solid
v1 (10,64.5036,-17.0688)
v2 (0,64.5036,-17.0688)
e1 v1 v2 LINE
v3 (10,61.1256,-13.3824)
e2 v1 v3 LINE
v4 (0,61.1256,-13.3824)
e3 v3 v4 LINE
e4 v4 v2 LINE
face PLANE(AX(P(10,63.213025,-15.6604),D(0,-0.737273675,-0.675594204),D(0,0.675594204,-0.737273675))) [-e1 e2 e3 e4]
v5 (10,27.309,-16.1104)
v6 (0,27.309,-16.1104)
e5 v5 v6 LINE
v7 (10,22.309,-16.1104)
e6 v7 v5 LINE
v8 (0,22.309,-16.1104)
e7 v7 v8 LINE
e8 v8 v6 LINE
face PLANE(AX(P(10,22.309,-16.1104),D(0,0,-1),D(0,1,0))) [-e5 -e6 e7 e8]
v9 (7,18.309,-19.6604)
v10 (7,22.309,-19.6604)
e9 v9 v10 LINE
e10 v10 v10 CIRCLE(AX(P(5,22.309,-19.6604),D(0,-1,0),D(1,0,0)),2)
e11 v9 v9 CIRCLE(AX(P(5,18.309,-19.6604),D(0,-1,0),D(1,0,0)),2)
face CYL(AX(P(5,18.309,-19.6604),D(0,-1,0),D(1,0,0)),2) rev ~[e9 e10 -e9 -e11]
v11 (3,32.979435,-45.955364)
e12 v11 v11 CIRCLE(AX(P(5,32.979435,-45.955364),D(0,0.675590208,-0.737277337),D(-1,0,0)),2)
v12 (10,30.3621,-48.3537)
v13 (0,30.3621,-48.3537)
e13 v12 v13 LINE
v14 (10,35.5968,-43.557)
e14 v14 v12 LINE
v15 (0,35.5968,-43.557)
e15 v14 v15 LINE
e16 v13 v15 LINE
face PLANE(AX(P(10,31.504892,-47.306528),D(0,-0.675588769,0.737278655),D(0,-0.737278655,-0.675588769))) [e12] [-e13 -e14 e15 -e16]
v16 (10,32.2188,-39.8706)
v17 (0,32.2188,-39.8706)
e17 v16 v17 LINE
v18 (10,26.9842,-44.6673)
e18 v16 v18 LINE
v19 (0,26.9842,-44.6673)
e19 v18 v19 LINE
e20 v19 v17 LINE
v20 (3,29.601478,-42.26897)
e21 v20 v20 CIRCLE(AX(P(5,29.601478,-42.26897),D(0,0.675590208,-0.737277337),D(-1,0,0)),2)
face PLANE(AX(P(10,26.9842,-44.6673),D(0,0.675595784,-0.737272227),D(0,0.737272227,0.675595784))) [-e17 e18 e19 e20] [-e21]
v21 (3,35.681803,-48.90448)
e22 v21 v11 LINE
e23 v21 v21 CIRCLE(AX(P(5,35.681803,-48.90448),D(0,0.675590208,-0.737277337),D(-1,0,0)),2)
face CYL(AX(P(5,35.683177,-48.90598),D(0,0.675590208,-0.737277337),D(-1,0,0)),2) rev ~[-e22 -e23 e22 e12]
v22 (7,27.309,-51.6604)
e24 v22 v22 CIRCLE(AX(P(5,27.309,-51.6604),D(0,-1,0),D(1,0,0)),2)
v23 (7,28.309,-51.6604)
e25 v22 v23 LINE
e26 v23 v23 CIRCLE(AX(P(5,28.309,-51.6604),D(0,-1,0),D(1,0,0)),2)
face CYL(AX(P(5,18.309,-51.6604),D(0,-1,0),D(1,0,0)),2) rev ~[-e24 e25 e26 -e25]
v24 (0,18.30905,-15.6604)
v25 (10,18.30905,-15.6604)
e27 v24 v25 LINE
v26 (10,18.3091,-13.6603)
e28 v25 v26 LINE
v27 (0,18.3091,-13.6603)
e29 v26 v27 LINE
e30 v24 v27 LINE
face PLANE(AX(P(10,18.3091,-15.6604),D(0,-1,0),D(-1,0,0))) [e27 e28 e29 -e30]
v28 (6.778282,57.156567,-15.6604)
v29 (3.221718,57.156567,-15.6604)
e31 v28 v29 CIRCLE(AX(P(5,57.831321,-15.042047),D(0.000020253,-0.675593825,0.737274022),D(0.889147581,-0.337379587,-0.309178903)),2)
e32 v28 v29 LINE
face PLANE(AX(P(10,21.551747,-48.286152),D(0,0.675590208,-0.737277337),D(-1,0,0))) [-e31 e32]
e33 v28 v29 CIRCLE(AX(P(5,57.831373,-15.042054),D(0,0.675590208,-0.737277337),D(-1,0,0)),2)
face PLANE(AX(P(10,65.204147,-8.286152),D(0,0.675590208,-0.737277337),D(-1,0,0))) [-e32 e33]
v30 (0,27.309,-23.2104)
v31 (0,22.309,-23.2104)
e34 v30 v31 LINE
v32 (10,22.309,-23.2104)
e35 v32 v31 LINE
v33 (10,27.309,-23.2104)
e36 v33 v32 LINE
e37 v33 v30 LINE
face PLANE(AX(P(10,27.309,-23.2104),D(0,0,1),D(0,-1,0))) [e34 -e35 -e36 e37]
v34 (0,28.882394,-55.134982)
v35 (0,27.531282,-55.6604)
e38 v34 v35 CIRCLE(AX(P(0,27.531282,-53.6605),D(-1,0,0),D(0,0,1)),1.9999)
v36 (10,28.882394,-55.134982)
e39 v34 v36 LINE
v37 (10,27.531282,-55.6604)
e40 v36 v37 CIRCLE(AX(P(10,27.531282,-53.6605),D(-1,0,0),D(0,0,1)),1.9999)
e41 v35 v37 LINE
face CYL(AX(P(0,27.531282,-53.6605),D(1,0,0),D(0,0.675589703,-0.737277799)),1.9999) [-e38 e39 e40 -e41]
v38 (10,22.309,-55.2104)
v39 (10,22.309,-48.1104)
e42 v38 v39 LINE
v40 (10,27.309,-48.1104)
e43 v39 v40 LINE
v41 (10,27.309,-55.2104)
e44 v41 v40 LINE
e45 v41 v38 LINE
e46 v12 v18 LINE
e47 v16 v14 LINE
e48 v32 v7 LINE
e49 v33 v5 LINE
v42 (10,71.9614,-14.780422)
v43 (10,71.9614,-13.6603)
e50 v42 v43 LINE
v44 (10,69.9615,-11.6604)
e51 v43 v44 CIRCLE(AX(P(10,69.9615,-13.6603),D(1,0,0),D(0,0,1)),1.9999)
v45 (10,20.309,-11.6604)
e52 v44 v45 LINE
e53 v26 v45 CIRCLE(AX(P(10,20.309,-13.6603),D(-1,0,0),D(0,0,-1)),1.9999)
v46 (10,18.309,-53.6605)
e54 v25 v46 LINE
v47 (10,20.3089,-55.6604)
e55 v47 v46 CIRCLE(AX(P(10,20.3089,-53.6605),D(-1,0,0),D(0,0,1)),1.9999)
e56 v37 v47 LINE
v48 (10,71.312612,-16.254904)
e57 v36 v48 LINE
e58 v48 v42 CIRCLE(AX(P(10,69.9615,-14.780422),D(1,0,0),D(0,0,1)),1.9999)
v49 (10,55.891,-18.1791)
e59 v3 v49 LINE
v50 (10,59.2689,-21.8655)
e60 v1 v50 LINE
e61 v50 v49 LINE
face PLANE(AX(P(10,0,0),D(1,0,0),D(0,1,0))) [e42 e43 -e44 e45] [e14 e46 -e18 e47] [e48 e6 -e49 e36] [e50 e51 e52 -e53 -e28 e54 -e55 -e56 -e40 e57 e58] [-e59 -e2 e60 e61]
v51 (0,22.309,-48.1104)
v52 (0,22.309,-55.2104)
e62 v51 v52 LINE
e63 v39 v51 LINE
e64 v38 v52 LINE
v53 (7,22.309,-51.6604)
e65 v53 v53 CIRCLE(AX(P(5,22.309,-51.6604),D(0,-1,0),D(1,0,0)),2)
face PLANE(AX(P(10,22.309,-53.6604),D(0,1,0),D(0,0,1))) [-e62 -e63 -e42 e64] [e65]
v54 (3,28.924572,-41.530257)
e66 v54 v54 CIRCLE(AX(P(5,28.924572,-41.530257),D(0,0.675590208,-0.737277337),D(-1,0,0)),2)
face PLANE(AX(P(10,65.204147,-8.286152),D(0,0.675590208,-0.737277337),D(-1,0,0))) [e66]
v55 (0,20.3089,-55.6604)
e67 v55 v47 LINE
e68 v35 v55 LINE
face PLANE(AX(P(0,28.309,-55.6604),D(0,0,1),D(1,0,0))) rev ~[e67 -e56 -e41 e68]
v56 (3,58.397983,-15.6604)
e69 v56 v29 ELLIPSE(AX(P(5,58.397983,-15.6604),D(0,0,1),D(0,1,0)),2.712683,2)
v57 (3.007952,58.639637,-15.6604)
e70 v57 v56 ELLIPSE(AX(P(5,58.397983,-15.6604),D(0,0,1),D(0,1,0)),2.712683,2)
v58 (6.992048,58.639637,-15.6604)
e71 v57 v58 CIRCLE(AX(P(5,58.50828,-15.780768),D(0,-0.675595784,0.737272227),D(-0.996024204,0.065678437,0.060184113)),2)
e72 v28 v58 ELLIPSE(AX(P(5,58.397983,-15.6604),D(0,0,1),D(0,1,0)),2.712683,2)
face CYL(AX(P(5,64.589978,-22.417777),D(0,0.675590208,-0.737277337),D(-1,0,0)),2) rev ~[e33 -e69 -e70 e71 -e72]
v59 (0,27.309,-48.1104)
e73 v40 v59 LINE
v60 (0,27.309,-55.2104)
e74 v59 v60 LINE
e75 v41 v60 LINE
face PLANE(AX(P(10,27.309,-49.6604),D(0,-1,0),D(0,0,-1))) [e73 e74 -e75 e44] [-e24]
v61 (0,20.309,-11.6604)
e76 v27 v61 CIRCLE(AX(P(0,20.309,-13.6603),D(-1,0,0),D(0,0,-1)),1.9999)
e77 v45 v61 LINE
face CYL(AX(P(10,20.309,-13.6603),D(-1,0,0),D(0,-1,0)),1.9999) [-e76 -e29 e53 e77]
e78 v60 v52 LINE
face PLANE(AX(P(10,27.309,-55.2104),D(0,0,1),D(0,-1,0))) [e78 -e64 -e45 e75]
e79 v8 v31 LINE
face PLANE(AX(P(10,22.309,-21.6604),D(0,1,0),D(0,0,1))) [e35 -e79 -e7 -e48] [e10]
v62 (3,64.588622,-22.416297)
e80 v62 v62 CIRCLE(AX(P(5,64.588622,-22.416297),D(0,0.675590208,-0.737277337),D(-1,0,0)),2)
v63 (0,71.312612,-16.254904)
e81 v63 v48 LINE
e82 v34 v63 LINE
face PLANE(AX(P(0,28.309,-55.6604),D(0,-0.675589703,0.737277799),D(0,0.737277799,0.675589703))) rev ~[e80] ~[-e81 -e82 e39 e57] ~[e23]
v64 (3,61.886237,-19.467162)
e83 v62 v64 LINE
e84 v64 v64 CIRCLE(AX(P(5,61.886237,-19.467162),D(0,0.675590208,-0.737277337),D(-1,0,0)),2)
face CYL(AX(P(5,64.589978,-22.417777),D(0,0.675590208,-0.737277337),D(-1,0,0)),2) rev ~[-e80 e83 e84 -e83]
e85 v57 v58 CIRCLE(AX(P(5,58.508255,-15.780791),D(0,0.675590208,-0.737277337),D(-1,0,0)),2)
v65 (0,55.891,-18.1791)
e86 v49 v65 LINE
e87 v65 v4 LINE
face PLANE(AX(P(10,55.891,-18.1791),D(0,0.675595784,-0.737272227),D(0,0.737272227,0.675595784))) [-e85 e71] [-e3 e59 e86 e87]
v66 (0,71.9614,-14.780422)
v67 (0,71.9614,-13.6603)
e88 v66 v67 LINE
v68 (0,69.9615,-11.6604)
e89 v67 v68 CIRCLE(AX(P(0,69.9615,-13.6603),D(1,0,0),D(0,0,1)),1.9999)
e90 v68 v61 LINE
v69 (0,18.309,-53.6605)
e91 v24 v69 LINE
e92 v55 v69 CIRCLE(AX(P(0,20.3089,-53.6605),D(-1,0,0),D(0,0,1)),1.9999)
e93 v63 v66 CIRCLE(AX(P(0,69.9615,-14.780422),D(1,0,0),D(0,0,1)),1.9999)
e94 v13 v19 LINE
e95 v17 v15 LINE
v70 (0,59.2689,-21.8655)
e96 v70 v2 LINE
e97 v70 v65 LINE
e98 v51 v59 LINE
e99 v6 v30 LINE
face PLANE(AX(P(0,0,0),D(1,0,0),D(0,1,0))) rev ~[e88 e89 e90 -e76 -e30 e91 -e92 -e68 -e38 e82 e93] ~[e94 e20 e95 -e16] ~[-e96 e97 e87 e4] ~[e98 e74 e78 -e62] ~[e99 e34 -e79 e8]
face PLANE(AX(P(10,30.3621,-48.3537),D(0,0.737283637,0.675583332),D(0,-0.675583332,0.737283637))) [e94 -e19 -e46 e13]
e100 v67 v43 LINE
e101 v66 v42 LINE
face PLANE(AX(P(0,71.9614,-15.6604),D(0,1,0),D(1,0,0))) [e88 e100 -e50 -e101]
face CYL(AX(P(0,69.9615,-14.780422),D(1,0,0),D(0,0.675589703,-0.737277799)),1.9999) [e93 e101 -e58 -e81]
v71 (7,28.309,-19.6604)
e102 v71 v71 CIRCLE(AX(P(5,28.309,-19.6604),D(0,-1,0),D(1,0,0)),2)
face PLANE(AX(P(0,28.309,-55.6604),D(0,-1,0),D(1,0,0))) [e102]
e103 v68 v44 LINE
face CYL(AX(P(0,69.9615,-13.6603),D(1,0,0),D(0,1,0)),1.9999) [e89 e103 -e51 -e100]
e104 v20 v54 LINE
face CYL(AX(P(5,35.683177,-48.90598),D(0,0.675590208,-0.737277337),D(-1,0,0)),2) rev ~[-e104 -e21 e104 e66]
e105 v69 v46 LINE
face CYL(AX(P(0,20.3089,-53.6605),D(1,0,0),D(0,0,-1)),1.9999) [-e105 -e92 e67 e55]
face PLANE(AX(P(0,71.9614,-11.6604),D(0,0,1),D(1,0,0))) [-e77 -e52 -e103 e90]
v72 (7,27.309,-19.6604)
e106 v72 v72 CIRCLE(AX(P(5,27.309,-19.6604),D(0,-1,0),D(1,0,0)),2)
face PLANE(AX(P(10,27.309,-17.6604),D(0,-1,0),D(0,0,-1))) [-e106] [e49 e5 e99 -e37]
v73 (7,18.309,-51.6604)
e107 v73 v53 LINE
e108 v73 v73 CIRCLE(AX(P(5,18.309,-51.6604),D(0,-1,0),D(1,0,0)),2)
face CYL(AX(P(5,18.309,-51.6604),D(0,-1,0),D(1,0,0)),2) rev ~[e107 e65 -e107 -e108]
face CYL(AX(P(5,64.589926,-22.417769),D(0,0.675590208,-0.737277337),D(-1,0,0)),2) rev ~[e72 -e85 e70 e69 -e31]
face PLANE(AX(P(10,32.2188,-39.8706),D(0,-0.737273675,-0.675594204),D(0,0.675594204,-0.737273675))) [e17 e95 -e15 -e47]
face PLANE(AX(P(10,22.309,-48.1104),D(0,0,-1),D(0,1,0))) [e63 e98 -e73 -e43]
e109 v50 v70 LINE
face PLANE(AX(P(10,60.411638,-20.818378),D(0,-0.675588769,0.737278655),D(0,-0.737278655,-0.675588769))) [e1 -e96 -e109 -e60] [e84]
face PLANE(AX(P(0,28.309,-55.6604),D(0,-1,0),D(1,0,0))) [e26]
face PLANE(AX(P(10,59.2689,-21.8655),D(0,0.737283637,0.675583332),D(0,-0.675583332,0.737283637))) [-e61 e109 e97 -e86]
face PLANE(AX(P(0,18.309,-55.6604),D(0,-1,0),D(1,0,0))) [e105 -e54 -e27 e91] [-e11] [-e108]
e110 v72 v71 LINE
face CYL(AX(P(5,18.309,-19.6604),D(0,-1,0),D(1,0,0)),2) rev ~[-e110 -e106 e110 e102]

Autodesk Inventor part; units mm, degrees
ref_plane "YZ Plane" through (0, 0, 0) normal (1, 0, 0) x (0, 1, 0)
ref_plane "XZ Plane" through (0, 0, 0) normal (0, 1, 0) x (-1, 0, 0)
ref_plane "XY Plane" through (0, 0, 0) normal (0, 0, 1) x (1, 0, 0)
sketch "Sketch1" plane through (0, 0, 0) normal (1, 0, 0) x (0, 1, 0)
  line L0 (28.309, -15.6604) -> (71.9614, -15.6604)
  line L1 (28.309, -55.6604) -> (28.309, -15.6604)
  line L2 (28.309, -55.6604) -> (71.9614, -15.6604)
  point P0 (0, 0)
  dimension "d2" = 42.5
  dimension "d3" = 90
  dimension "d4" = 40
extrude "Extrusion1" add sketch "Sketch1" along normal blind 10
sketch "Sketch2" plane through (0, 28.309, -55.6604) normal (0, -1, 0) x (1, 0, 0)
  line L0 (0, 40) -> (0, 0) projected
  line L1 (0, 0) -> (10, 0) projected
  line L2 (10, 40) -> (10, 0) projected
  line L3 (0, 40) -> (10, 40) projected
  point P0 (0, 55.6604)
extrude "Extrusion2" add sketch "Sketch2" along normal blind 10
sketch "Sketch3" plane through (0, 18.309, -55.6604) normal (0, -1, 0) x (1, 0, 0)
  arc A0 (1, 4) -> (9, 4) centre (5, 4) ccw projected
  line L0 (9, 4) -> (9, 100) projected
  arc A1 (9, 100) -> (1, 100) centre (5, 100) ccw projected
  line L1 (1, 100) -> (1, 4) projected
  circle A2 centre (5, 100) radius 2 projected
  circle A3 centre (5, 92) radius 2 projected
  circle A4 centre (5, 84) radius 2 projected
  circle A5 centre (5, 76) radius 2 projected
  circle A6 centre (5, 68) radius 2 projected
  circle A7 centre (5, 60) radius 2 projected
  circle A8 centre (5, 52) radius 2 projected
  circle A9 centre (5, 44) radius 2 projected
  circle A10 centre (5, 36) radius 2 projected
  circle A11 centre (5, 28) radius 2 projected
  circle A12 centre (5, 20) radius 2 projected
  circle A13 centre (5, 12) radius 2 projected
  circle A14 centre (5, 4) radius 2 projected
  point P0 (0, 55.6604)
extrude "Extrusion3" cut sketch "Sketch3" against normal blind 10 contours A10 | A14
sketch "Sketch4" plane through (10, 71.9614, -15.6604) normal (0, 0.6755902, -0.7372773) x (-1, 0, 0)
  line L0 (10, -59.2075) -> (10, 0) projected
  line L1 (10, 0) -> (0, 0) projected
  line L2 (0, -59.2075) -> (0, 0) projected
  line L3 (10, -59.2075) -> (0, -59.2075) projected
  circle A0 centre (5, -10) radius 2
  circle A1 centre (5, -49.2075) radius 2
  point P0 (10, -42.4755)
  dimension "d11" = 4
  dimension "d12" = 4
  dimension "d13" = 10
  dimension "d14" = 10
extrude "Extrusion4" cut sketch "Sketch4" against normal blind 10 contours A0 | A1
sketch "Sketch5" plane through (10, 0, 0) normal (1, 0, 0) x (0, 0, -1)
  line L0 (53.6604, 18.309) -> (53.6604, 28.309) projected
  line L1 (49.6604, 18.309) -> (49.6604, 28.309) projected
  line L2 (21.6604, 18.309) -> (21.6604, 28.309) projected
  line L3 (17.6604, 18.309) -> (17.6604, 28.309) projected
  line L4 (16.1104, 27.309) -> (23.2104, 27.309)
  line L5 (23.2104, 27.309) -> (23.2104, 22.309)
  line L6 (23.2104, 22.309) -> (16.1104, 22.309)
  line L7 (16.1104, 22.309) -> (16.1104, 27.309)
  line L8 (55.6604, 18.309) -> (15.6604, 18.309) projected
  line L9 (48.1104, 27.309) -> (55.2104, 27.309)
  line L10 (55.2104, 27.309) -> (55.2104, 22.309)
  line L11 (55.2104, 22.309) -> (48.1104, 22.309)
  line L12 (48.1104, 22.309) -> (48.1104, 27.309)
  line L13 (23.7675, 63.114) -> (16.3947, 56.3581) projected
  line L14 (21.0651, 66.0632) -> (15.6604, 61.1106) projected
  line L15 (50.2557, 34.2073) -> (42.8829, 27.4514) projected
  line L16 (47.5533, 37.1564) -> (40.1805, 30.4005) projected
  line L17 (17.0688, 64.5036) -> (21.8655, 59.2689)
  line L18 (21.8655, 59.2689) -> (18.1791, 55.891)
  line L19 (18.1791, 55.891) -> (13.3824, 61.1256)
  line L20 (13.3824, 61.1256) -> (17.0688, 64.5036)
  line L21 (55.6604, 28.309) -> (15.6604, 71.9614) projected
  line L22 (15.6604, 71.9614) -> (15.6604, 18.309) projected
  line L23 (43.557, 35.5968) -> (48.3537, 30.3621)
  line L24 (48.3537, 30.3621) -> (44.6673, 26.9842)
  line L25 (44.6673, 26.9842) -> (39.8706, 32.2188)
  line L26 (39.8706, 32.2188) -> (43.557, 35.5968)
  point P0 (0, 0)
  dimension "d17" = 7.1
  dimension "d18" = 5
  dimension "d19" = 4
  dimension "d20" = 1.55
  dimension "d21" = 4
  dimension "d22" = 7.1
  dimension "d23" = 5
  dimension "d24" = 4
  dimension "d25" = 1.55
  dimension "d28" = 7.1
  dimension "d29" = 5
  dimension "d30" = 1.55
  dimension "d31" = 4
  dimension "d33" = 7.1
  dimension "d34" = 5
  dimension "d35" = 4
  dimension "d36" = 1.55
sketch "Sketch6" plane through (0, 71.9614, -15.6604) normal (0, 0, 1) x (1, 0, 0)
  ellipse E0 centre (5, -13.5634) end of major axis (5, -16.2761) minor radius 2 (6.7794, -14.8019) -> (3.2206, -14.8019) ccw projected
  line L0 (6.7794, -14.8019) -> (3.2206, -14.8019) projected
  line L1 (0, 0) -> (0, -53.6523) projected
  line L2 (10, -53.6523) -> (0, -53.6523) projected
  line L3 (10, 0) -> (10, -53.6523) projected
  line L4 (0, 0) -> (10, 0) projected
  point P0 (0, -71.9614)
extrude "Extrusion6" add sketch "Sketch6" along normal blind 4 contours L0 E0 | L4 L3 L2 L1
sketch "Sketch7" plane through (10, 28.309, -55.6604) normal (0, 0.6755902, -0.7372773) x (-1, 0, 0)
  circle A0 centre (5, 10) radius 2 projected
  circle A1 centre (5, 49.2075) radius 2 projected
  line L0 (10, 0) -> (10, 59.2075) projected
  line L1 (10, 59.2075) -> (0, 59.2075) projected
  line L2 (0, 0) -> (0, 59.2075) projected
  line L3 (10, 0) -> (0, 0) projected
  point P0 (10, 16.732)
extrude "Extrusion7" cut sketch "Sketch7" against normal blind 10 contours A1
extrude "Extrusion8" cut sketch "Sketch5" against normal blind 10 contours L11 L1 L9 L0 | L0 L9 L10 L11 | L11 L12 L9 L1 | L6 L3 L4 L2 | L2 L4 L5 L6 | L6 L7 L4 L3 | L17 L18 L19 L13 | L13 L19 L22 L14 L17 | L14 L22 L20 L17 | L19 L20 L22 | L23 L24 L25 L15 | L15 L25 L16 L23 | L16 L25 L26 L23
fillet "Fillet1" radius 2 5 edges at (5, 71.9614, -11.6604) (5, 71.9614, -15.6604) (5, 18.309, -11.6604) (5, 18.309, -55.6604) (5, 28.309, -55.6604)
sketch "Sketch8" plane through (10, 28.8825, -55.1349) normal (0, 0.6755902, -0.7372773) x (-1, 0, 0)
  line L0 (10, 0) -> (0, 0) projected
  line L1 (10, 0) -> (10, 57.5497) projected
  line L2 (0, 57.5497) -> (10, 57.5497) projected
  line L3 (0, 0) -> (0, 57.5497) projected
  circle A0 centre (5, 48.4297) radius 2 projected
  circle A1 centre (5, 9.2222) radius 2 projected
  line L4 (0, 60.3064) -> (10, 60.3064) projected
  line L5 (10, -7.3248) -> (0, -7.3248) projected
  line L6 (0, 60.3064) -> (10, 60.3064)
  line L7 (10, 60.3064) -> (10, -7.3248)
  line L8 (10, -7.3248) -> (0, -7.3248)
  line L9 (0, -7.3248) -> (0, 60.3064)
  line L10 (0, -1.3512) -> (10, -1.3512) projected
  point P0 (10, 15.9542)
  dimension "d44" = 10
  dimension "d45" = 4
  dimension "d46" = 9.8766
  dimension "d47" = 61.6575
  dimension "d48" = 39.2075
equation "\"d14\" = d13"
equation "\"d20\" = -0.5 * d19 + 0.5 * d17"
equation "\"d24\" = d21"
equation "\"d25\" = d20"
equation "\"d28\" = d17"
equation "\"d29\" = d18"
equation "\"d30\" = d20"
equation "\"d31\" = d21"
equation "\"d35\" = d21"
equation "\"d36\" = d20"
properties part number "intake plate holder"
